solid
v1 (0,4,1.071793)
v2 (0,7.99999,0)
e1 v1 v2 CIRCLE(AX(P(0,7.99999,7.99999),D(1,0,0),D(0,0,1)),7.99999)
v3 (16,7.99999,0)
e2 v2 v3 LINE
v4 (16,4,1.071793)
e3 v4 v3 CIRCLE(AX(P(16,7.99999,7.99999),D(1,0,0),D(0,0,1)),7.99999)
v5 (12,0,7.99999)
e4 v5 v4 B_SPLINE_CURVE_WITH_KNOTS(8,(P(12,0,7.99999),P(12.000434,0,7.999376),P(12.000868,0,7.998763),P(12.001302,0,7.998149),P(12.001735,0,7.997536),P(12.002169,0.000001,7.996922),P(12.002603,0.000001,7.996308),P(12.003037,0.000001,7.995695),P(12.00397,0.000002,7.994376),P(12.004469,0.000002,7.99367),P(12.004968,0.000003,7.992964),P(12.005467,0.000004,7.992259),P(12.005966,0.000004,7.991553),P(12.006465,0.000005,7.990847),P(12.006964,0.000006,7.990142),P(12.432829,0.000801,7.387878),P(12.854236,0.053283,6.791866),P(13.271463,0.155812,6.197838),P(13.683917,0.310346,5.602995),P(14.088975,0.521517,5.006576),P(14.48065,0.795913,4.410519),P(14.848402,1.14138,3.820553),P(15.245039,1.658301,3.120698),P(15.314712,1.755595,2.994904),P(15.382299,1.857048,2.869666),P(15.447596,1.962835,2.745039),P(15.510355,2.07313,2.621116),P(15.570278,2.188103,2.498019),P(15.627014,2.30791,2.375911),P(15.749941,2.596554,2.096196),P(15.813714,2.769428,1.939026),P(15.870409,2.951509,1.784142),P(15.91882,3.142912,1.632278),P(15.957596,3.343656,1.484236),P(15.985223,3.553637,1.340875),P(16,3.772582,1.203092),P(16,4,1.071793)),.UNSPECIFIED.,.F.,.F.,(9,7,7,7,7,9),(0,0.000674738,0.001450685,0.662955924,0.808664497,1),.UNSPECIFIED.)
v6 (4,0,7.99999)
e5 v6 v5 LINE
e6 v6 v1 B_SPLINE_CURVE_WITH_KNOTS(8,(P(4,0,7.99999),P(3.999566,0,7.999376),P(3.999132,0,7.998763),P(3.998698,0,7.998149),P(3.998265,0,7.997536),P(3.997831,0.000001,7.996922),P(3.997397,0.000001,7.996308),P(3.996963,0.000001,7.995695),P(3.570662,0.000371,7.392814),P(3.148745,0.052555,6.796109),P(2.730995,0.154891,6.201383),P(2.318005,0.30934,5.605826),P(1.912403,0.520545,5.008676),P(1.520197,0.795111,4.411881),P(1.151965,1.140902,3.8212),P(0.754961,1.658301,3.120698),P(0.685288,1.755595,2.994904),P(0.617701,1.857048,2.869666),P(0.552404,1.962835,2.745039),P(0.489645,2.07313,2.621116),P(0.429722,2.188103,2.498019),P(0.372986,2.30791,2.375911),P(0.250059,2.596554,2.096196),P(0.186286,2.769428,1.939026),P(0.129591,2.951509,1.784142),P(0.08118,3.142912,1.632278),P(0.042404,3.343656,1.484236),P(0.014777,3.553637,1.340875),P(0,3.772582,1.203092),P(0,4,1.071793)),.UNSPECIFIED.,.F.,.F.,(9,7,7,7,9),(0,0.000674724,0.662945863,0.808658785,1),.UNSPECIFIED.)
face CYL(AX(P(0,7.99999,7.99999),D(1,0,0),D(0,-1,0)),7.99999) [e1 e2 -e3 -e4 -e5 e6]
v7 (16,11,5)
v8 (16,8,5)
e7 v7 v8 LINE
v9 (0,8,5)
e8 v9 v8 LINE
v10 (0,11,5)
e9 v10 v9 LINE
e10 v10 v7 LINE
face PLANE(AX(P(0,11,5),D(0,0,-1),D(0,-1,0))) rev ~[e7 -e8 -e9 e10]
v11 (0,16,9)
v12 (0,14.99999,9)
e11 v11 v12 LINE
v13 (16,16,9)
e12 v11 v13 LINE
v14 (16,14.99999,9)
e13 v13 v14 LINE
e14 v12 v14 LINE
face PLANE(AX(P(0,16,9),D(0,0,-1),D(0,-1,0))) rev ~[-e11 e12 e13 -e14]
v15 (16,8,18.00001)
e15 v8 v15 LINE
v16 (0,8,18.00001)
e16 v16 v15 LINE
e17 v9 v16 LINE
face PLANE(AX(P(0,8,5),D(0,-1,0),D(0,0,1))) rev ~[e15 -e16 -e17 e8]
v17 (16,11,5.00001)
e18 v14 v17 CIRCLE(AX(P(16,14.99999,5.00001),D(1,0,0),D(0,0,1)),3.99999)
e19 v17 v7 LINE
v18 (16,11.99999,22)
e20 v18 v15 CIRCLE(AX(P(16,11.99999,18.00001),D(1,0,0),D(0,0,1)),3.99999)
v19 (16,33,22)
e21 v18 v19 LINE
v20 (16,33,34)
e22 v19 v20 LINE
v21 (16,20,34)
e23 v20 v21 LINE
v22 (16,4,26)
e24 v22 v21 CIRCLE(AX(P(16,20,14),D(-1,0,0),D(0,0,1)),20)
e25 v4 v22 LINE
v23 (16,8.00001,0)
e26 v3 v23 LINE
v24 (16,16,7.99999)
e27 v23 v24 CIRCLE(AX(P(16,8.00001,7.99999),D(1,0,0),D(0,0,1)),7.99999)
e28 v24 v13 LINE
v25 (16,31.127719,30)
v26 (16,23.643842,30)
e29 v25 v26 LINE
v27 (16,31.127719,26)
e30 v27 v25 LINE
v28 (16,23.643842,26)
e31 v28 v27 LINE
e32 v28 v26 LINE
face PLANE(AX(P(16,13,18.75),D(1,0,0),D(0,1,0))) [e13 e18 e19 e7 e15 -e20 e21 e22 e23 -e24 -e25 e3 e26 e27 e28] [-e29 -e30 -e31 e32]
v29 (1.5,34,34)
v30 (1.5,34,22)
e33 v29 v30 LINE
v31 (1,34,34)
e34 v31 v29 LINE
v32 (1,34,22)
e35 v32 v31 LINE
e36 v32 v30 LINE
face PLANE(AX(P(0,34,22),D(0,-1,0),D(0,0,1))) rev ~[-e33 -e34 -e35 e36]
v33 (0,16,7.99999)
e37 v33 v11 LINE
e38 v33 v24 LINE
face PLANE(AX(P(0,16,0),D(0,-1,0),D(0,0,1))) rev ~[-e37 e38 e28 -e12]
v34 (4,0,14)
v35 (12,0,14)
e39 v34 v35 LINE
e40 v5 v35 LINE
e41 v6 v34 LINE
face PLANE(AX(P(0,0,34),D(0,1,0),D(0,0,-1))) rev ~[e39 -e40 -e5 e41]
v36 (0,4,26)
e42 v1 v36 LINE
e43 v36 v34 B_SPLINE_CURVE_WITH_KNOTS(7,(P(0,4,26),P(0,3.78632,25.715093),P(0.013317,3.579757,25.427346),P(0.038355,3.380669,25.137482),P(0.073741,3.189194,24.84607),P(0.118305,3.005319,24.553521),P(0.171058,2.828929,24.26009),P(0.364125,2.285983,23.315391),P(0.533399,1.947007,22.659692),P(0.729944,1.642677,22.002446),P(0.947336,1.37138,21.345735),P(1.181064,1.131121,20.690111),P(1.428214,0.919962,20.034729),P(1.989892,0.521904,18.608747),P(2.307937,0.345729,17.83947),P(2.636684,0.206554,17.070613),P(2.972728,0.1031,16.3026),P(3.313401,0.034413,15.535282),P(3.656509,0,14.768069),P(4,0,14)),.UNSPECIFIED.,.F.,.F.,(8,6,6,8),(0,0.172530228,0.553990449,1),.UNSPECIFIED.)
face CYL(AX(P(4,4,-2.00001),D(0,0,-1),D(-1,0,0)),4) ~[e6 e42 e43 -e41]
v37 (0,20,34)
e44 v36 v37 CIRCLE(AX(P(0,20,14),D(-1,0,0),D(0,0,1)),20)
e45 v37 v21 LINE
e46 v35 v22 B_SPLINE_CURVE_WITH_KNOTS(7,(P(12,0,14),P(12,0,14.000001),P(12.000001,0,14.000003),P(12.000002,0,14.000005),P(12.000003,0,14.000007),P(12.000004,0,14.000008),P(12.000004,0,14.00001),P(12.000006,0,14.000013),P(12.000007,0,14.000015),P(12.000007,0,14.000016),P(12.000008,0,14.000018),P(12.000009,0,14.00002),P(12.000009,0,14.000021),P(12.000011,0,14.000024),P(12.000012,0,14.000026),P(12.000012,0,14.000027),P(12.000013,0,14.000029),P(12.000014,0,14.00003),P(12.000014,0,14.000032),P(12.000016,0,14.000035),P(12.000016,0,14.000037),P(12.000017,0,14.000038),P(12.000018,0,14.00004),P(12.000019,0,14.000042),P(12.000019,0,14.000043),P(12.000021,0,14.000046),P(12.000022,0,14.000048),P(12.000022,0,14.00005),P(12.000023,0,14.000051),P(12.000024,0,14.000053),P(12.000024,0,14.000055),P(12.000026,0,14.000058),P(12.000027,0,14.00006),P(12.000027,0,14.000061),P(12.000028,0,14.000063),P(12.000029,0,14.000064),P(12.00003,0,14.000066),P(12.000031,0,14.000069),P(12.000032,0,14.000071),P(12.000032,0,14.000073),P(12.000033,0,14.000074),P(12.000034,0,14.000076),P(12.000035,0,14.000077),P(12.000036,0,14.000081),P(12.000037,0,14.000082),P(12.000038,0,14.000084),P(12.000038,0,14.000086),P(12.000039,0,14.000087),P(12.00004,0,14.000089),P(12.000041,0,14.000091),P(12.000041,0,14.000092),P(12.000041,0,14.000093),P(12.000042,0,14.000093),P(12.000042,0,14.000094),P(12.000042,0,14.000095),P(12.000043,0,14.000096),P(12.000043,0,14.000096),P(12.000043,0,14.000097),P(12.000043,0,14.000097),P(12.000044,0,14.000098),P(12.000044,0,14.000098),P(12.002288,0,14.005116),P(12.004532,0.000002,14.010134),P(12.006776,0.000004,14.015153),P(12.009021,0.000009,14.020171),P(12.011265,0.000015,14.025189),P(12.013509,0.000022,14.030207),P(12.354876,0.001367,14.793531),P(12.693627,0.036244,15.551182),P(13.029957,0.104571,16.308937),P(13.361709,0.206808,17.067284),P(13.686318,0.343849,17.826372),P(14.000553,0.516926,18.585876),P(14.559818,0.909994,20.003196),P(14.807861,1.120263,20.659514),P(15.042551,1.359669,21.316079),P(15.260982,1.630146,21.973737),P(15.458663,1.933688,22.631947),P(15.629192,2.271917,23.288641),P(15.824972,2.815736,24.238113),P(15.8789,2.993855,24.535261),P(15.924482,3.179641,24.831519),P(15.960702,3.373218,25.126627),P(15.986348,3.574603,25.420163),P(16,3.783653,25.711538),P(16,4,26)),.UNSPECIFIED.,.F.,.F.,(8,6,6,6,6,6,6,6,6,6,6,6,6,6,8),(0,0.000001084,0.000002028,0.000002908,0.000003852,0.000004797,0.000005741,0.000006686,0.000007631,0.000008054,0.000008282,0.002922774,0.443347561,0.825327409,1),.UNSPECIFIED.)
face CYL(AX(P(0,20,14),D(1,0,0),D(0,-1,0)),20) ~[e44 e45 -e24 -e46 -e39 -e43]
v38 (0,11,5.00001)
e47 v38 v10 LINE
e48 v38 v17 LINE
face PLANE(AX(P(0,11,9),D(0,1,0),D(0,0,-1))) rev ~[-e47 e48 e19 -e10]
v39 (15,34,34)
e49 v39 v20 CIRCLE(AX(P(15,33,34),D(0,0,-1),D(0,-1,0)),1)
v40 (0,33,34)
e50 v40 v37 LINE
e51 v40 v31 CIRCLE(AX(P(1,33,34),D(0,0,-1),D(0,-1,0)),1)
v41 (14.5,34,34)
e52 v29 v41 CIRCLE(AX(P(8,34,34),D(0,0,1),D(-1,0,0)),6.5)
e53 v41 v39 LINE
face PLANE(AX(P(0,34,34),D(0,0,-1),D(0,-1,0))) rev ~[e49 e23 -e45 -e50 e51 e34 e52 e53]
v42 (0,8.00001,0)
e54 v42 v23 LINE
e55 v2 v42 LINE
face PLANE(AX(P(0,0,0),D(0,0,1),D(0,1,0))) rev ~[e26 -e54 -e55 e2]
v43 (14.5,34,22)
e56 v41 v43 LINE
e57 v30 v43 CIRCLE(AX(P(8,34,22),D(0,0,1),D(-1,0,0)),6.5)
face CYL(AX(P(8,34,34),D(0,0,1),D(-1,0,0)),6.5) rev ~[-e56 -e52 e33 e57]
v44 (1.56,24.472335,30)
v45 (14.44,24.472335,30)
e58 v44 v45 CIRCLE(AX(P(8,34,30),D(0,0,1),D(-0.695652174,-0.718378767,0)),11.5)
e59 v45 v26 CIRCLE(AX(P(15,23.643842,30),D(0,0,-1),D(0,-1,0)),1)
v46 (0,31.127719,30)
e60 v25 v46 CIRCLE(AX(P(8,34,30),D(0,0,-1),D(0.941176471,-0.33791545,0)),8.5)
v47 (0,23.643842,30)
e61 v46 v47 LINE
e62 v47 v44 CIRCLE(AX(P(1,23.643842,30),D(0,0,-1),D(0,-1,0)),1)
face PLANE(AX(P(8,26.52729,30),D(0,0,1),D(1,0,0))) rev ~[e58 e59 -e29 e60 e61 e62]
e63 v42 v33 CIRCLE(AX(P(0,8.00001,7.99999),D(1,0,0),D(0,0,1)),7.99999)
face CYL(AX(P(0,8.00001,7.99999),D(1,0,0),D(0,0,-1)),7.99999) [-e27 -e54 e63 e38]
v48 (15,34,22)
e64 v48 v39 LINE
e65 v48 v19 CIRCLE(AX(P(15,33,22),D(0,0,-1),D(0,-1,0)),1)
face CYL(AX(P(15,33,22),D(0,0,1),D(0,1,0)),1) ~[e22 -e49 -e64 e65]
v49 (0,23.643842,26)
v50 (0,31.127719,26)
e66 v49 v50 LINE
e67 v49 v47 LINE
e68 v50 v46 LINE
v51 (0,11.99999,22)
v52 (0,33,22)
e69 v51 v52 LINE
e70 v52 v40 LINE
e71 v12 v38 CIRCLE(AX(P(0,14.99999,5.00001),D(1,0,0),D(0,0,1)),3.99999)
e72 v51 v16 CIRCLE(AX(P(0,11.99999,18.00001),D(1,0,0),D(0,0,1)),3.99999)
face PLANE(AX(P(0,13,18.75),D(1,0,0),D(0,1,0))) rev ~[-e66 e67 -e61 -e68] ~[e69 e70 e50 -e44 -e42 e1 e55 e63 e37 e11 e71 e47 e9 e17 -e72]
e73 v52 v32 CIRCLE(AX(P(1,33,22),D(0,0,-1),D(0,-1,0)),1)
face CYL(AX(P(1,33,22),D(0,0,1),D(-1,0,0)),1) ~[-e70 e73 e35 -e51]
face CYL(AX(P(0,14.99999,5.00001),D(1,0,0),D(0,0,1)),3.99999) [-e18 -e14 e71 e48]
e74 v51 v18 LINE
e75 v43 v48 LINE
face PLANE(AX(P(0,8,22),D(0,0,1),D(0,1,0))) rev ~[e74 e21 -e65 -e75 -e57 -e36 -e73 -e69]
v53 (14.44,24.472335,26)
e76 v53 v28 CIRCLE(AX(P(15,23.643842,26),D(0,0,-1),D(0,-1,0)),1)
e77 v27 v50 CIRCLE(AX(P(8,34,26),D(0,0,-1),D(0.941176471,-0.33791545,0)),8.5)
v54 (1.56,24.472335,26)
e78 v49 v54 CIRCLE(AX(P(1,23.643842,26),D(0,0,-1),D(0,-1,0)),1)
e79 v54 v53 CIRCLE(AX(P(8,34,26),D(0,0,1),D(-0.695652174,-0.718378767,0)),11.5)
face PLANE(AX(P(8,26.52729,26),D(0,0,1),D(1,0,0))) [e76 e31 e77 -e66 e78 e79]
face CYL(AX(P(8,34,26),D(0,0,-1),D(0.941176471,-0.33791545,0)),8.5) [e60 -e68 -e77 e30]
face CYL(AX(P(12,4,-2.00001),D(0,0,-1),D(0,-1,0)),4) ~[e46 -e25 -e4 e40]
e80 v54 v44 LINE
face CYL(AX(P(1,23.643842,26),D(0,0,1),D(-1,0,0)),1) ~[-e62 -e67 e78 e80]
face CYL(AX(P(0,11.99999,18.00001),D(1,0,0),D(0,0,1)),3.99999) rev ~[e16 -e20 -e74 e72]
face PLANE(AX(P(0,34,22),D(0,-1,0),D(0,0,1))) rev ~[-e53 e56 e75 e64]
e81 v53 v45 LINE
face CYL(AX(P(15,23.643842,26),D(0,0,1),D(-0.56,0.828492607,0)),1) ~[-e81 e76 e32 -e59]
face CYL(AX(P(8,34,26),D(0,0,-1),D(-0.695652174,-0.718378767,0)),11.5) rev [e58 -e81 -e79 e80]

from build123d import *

# Parameters (mm, degrees)
F1_DEPTH     = 16
F2_R         = 7.99999
F3_R         = 20
F4_R         = 3.99999
F6_DEPTH     = 34.001
F8_DEPTH     = 4
F11_R        = 1
F12_T1_DEPTH = 33.00001


# Not quite as in the source:
# - a fillet or chamfer that OpenCascade refuses, or shapes differently, is made with other operations: its cross-section is extruded or revolved along the edge and cut away or added
# - a fillet or chamfer is up to 0.001 mm smaller than in the source, because OpenCascade refuses the exact size


with BuildPart() as f1:
    # F0 (on Right) → F1 (new body)
    with BuildSketch(Plane.YZ):
        Polygon((34, 34), (0, 34), (0, 0), (16, 0), (16, 9), (11, 9), (11, 5), (8, 5), (8, 22), (34, 22), align=None)
    extrude(amount=F1_DEPTH)

    # F2 (radius 8 in the source; OpenCascade refuses exactly that, so slightly less here)
    f2_edges = [f1.edges().sort_by_distance(p)[0] for p in [
        (8, 16, 0),
        (8, 0, 0),
    ]]
    fillet(f2_edges, radius=F2_R)

    # F3
    f3_edges = [f1.edges().sort_by_distance(p)[0] for p in [
        (8, 0, 34),
    ]]
    fillet(f3_edges, radius=F3_R)

    # F4 (radius 4 in the source; OpenCascade refuses exactly that, so slightly less here)
    f4_edges = [f1.edges().sort_by_distance(p)[0] for p in [
        (8, 8, 22),
        (8, 11, 9),
    ]]
    fillet(f4_edges, radius=F4_R)

    # F5 (on face) → F6 (cut, through all)
    with BuildSketch(Plane.XY.offset(34)):
        with BuildLine():
            ThreePointArc((1.5, 34), (8, 27.5), (14.5, 34))
            Line((14.5, 34), (1.5, 34))
        make_face()
    extrude(amount=-F6_DEPTH, mode=Mode.SUBTRACT)


with BuildPart() as f8:
    # F7 (on face) → F8 (new body)
    with BuildSketch(Plane.XY.offset(34)):
        with BuildLine():
            ThreePointArc((16, 31.1277186767), (8, 25.5), (0, 31.1277186767))
            Line((0, 31.1277186767), (0, 25.7386441791))
            ThreePointArc((0, 25.7386441791), (8, 22.5), (16, 25.7386441791))
            Line((16, 25.7386441791), (16, 31.1277186767))
        make_face()
    extrude(amount=F8_DEPTH)


with BuildPart() as f8_1:
    # F9: moved
    add(f8.part.moved(Location((0, 0, -8))))


with BuildPart() as f1_1:
    add(f1.part)

    # F10: cut F8
    add(f8_1.part, mode=Mode.SUBTRACT)

    # F11
    f11_edges = [f1_1.edges().sort_by_distance(p)[0] for p in [
        (16, 34, 28),
        (16, 25.738644, 28),
        (0, 34, 28),
        (0, 25.738644, 28),
    ]]
    fillet(f11_edges, radius=F11_R)

    # F12: fillet of radius 4 on 2 edges, made by hand

    # F12_s2 → F12_t1 (cut)
    with BuildSketch(Plane.XY.offset(-2.00001)):
        with BuildLine():
            ThreePointArc((12, 0), (14.8284271247, 1.1715728753), (16, 4))
            Line((16, 4), (16, 0))
            Line((16, 0), (12, 0))
        make_face()
        with BuildLine():
            ThreePointArc((0, 4), (1.1715728753, 1.1715728753), (4, 0))
            Line((4, 0), (0, 0))
            Line((0, 0), (0, 4))
        make_face()
    extrude(amount=F12_T1_DEPTH, mode=Mode.SUBTRACT)


solid = f1_1.part
